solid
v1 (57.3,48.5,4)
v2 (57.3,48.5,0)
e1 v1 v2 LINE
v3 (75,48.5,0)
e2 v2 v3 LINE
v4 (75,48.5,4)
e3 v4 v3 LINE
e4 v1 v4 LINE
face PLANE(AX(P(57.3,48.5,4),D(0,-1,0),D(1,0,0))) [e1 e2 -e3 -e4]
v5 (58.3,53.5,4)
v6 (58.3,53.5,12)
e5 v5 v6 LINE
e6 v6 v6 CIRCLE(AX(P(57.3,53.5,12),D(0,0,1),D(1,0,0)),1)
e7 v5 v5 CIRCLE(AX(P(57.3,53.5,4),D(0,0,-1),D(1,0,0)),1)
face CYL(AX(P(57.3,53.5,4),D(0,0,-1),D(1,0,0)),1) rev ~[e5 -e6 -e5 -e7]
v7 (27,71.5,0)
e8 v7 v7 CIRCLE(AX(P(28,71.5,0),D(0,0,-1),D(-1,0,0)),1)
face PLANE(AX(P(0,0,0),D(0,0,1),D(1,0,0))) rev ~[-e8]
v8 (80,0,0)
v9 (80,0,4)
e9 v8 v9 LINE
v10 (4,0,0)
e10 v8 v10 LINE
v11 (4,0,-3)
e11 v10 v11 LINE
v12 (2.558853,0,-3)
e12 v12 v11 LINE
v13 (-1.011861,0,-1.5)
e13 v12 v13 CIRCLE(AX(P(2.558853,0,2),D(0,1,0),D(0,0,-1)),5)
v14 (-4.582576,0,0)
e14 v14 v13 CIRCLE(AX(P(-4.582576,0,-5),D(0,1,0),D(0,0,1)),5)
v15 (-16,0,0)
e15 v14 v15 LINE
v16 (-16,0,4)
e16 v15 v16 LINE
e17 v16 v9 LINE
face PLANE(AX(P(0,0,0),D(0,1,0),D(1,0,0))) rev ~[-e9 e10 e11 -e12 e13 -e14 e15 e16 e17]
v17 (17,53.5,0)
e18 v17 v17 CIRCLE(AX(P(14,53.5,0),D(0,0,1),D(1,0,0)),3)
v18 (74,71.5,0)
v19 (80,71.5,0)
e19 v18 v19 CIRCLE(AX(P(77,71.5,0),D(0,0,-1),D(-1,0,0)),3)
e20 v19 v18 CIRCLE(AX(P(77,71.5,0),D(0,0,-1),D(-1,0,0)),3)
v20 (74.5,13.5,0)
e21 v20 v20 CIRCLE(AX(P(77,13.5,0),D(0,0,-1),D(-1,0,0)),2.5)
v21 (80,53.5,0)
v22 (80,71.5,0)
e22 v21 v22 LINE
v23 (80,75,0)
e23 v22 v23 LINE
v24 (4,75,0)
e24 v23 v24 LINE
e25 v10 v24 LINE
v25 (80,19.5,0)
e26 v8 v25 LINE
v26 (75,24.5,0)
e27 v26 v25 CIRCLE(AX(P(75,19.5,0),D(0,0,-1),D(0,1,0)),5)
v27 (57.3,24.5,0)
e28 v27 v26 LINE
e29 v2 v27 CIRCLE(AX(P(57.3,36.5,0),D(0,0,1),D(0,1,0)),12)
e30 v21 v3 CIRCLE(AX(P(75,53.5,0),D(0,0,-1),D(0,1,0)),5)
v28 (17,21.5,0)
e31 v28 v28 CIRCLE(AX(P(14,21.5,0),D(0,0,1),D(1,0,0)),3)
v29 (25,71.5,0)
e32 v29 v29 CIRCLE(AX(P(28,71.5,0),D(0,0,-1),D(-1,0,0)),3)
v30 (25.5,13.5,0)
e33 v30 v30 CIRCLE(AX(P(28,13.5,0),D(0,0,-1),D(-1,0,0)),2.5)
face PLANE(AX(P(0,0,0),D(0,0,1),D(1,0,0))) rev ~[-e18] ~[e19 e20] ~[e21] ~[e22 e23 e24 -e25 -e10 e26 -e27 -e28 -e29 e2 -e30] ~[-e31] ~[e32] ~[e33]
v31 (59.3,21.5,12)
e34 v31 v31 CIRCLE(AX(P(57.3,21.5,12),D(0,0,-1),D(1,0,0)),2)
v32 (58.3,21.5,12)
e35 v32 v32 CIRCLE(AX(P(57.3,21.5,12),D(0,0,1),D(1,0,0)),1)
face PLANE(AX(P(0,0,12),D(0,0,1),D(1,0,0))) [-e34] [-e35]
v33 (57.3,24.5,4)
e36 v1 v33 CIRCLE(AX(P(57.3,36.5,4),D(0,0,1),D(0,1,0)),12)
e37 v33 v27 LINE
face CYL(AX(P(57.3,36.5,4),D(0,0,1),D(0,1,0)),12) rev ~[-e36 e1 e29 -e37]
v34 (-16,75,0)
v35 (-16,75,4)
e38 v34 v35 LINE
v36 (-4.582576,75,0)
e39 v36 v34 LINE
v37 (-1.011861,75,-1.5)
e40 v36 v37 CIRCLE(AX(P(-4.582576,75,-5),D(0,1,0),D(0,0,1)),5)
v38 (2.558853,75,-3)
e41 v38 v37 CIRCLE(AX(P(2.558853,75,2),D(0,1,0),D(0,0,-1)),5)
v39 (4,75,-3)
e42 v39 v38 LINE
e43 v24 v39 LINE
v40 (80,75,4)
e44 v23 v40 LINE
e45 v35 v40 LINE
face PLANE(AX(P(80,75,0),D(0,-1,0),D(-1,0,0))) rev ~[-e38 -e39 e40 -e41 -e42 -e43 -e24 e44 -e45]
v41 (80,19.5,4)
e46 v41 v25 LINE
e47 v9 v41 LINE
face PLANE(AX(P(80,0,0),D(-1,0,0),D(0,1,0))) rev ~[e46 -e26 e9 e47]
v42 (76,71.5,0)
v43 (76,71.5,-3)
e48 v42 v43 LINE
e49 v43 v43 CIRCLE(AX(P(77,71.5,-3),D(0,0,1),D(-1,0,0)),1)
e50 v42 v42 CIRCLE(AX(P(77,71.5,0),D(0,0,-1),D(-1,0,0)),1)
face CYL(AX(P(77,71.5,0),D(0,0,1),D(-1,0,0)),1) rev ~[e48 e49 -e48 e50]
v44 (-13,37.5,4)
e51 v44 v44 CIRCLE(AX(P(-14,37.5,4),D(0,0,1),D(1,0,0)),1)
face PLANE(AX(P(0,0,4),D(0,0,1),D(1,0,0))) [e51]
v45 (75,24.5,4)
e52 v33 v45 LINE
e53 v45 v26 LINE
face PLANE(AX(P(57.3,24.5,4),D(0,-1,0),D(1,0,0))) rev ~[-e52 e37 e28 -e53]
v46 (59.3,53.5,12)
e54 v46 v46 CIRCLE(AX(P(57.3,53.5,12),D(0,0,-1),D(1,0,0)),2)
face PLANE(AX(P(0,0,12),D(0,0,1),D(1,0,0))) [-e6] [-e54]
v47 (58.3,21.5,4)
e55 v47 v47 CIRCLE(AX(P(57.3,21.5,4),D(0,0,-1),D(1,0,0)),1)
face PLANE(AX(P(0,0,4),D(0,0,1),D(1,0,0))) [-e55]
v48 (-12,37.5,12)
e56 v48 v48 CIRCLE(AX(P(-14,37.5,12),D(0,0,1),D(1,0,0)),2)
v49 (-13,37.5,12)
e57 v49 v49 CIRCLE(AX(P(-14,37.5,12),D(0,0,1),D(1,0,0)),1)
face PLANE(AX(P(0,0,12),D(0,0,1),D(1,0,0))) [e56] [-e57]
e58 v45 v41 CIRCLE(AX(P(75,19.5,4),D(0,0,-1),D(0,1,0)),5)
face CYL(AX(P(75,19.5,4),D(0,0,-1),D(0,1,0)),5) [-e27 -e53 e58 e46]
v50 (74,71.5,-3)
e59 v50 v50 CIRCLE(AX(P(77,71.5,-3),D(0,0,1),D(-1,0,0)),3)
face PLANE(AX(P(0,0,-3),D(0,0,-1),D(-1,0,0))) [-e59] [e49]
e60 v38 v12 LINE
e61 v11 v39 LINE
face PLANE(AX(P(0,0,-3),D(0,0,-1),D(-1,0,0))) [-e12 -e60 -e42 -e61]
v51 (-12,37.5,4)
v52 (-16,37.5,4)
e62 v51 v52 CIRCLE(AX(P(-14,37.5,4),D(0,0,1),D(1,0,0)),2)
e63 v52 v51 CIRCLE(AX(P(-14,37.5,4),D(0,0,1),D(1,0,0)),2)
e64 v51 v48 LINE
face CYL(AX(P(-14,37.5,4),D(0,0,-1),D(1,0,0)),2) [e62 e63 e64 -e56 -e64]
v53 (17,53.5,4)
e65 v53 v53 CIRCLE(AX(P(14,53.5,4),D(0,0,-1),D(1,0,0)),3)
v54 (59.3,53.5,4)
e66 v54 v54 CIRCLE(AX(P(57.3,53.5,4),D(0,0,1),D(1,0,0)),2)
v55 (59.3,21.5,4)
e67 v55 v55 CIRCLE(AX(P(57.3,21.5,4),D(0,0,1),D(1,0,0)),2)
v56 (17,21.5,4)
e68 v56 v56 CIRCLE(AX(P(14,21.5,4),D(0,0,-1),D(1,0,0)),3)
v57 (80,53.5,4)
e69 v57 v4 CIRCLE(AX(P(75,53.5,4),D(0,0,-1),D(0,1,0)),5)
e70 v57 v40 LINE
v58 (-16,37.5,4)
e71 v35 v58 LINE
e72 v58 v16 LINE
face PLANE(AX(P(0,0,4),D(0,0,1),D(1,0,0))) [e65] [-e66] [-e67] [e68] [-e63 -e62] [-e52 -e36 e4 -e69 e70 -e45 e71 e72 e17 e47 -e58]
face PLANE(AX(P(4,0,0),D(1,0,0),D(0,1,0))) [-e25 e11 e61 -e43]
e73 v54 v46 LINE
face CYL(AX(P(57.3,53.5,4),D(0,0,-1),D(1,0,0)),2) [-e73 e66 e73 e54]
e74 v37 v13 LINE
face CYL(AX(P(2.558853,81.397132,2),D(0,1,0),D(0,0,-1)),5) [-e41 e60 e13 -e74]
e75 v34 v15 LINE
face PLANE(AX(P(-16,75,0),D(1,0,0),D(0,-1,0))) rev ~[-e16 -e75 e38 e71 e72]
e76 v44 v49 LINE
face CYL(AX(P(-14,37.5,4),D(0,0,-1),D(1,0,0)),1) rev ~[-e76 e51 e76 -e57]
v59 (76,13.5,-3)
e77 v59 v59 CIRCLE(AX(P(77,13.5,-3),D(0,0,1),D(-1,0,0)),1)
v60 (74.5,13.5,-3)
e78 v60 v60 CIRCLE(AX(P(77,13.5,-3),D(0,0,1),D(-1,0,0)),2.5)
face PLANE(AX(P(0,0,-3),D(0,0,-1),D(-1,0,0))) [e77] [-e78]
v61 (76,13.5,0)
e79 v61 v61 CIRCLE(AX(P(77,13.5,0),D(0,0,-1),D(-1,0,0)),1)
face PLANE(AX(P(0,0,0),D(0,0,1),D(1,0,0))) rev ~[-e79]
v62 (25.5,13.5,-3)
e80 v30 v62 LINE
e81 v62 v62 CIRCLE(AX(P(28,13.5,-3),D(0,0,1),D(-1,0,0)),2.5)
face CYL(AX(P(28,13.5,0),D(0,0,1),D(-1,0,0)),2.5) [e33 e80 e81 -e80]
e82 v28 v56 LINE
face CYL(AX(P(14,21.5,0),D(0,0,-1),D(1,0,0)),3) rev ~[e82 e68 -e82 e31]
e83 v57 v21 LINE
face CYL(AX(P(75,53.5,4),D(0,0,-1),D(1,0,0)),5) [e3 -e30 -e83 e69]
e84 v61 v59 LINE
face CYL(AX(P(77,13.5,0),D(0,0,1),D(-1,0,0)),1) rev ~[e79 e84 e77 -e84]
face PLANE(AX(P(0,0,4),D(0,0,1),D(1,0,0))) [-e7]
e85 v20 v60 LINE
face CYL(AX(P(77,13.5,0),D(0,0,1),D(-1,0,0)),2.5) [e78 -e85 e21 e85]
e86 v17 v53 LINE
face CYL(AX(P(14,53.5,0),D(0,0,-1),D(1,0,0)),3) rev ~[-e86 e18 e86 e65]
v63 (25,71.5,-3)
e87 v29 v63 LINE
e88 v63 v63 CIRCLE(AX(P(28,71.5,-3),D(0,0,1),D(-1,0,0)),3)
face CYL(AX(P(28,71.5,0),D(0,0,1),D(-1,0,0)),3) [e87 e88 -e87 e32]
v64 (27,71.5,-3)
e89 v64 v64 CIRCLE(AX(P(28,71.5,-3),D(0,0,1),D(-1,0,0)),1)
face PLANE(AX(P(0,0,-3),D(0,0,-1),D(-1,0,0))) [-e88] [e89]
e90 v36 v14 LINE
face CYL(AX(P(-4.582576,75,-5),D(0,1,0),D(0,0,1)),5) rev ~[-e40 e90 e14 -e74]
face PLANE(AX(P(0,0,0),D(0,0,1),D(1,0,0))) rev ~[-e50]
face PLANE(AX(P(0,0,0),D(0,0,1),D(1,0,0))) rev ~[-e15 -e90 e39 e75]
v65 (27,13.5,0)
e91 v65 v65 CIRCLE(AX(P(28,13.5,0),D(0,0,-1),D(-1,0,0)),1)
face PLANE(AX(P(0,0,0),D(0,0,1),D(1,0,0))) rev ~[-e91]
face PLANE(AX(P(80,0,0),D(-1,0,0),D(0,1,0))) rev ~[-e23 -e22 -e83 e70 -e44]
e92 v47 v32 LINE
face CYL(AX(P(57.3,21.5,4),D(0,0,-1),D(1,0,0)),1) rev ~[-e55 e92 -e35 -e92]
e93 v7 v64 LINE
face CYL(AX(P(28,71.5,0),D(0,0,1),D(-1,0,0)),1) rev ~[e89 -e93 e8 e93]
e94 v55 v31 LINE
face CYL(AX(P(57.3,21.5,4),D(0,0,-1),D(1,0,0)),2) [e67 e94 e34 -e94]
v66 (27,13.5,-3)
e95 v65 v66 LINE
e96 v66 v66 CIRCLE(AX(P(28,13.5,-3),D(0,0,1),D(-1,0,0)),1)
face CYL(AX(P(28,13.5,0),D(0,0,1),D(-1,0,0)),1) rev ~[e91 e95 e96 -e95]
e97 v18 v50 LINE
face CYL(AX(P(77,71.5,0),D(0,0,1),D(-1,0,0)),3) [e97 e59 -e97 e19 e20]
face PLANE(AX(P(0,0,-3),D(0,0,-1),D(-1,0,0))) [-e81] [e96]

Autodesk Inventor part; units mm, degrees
ref_plane "YZ Plane" through (0, 0, 0) normal (1, 0, 0) x (0, 1, 0)
ref_plane "XZ Plane" through (0, 0, 0) normal (0, 1, 0) x (-1, 0, 0)
ref_plane "XY Plane" through (0, 0, 0) normal (0, 0, 1) x (1, 0, 0)
sketch "Szkic1" plane through (0, 0, 0) normal (0, 0, 1) x (1, 0, 0)
  line L0 (0, 0) -> (80, 0)
  line L1 (80, 0) -> (80, 75)
  line L2 (80, 75) -> (0, 75)
  line L3 (0, 75) -> (0, 0)
  circle A0 centre (14, 53.5) radius 3
  line L4 (14, 53.5) -> (14, 21.5)
  circle A1 centre (14, 21.5) radius 3
  line L5 (0, 75) -> (-16, 75)
  line L6 (-16, 75) -> (-16, 0)
  line L7 (-16, 0) -> (0, 0)
  line L8 (0, 0) -> (0, 75)
  dimension "d0" = 80
  dimension "d1" = 75
  dimension "d2" = 6
  dimension "d3" = 32
  dimension "d4" = 6
  dimension "d5" = 16
  dimension "d43" = 66
extrude "Wyciągnięcie proste1" add sketch "Szkic1" along normal blind 4
sketch "Szkic2" plane through (0, 0, 0) normal (0, 0, -1) x (-1, 0, 0)
  line L0 (16, 75) -> (16, 0) projected
  line L1 (-80, 75) -> (16, 75) projected
  line L2 (-80, 0) -> (-80, 75) projected
  line L3 (16, 0) -> (-80, 0) projected
  circle A0 centre (-14, 53.5) radius 3 projected
  circle A1 centre (-14, 21.5) radius 3 projected
  line L4 (-80, 75) -> (16, 75) projected
  line L5 (0, 0) -> (-4, 0)
  line L6 (-4, 0) -> (-4, 75)
  line L7 (-4, 75) -> (0, 75)
  line L8 (0, 75) -> (0, 0)
  line L9 (-4, 0) -> (-24, 0)
  line L10 (-24, 0) -> (-24, 75)
  line L11 (-24, 75) -> (-4, 75)
  line L12 (-4, 75) -> (-4, 0)
  line L13 (-24.5, 75) -> (-80.5, 75)
  line L14 (-80.5, 75) -> (-80.5, 13.5)
  line L15 (-80.5, 13.5) -> (-24.5, 13.5)
  line L16 (-24.5, 13.5) -> (-24.5, 75)
  line L17 (-28, 17) -> (-77, 17)
  line L18 (-77, 17) -> (-77, 71.5)
  line L19 (-77, 71.5) -> (-28, 71.5)
  line L20 (-28, 71.5) -> (-28, 17)
  circle A2 centre (-28, 71.5) radius 1
  circle A3 centre (-77, 71.5) radius 1
  circle A4 centre (-28, 71.5) radius 3
  circle A5 centre (-77, 71.5) radius 3
  circle A6 centre (-28, 13.5) radius 1
  circle A7 centre (-77, 13.5) radius 1
  circle A8 centre (-77, 13.5) radius 2.5
  circle A9 centre (-28, 13.5) radius 2.5
  dimension "d8" = 4
  dimension "d9" = 20
  dimension "d10" = 56
  dimension "d11" = 61.5
  dimension "d12" = 3.5
  dimension "d15" = 2
  dimension "d16" = 2
  dimension "d19" = 2
  dimension "d20" = 2
  dimension "d34" = 2
  dimension "d35" = 2
  dimension "d36" = 1.5
  dimension "d37" = 1.5
  dimension "d44" = 4
extrude "Wyciągnięcie proste2" add sketch "Szkic2" along normal blind 3 contours L8 L3 L6 L1 | A5 L19 A3 L18 | A9 L15 A6 | L15 A6 A9 | A8 L15 A7 | L15 A7 A8 | A5 L18 A3 L19 | A4 L20 A2 L19 | L19 A2 L20 A4
sketch "Szkic3" plane through (0, 0, 4) normal (0, 0, 1) x (1, 0, 0)
  circle A0 centre (-14, 37.5) radius 2
  circle A1 centre (-14, 37.5) radius 1
  line L0 (-14, 37.5) -> (57.3, 37.5)
  line L1 (57.3, 37.5) -> (57.3, 53.5)
  line L2 (57.3, 37.5) -> (57.3, 21.5)
  circle A2 centre (57.3, 21.5) radius 1
  circle A3 centre (57.3, 21.5) radius 2
  circle A4 centre (57.3, 53.5) radius 1
  circle A5 centre (57.3, 53.5) radius 2
  point P0 (0, 0)
  dimension "d23" = 4
  dimension "d24" = 2
  dimension "d25" = 71.3
  dimension "d26" = 16
  dimension "d27" = 16
  dimension "d28" = 2
  dimension "d29" = 4
  dimension "d30" = 2
  dimension "d31" = 4
extrude "Wyciągnięcie proste3" add sketch "Szkic3" along normal blind 8
sketch "Szkic4" plane through (0, 0, 4) normal (0, 0, 1) x (1, 0, 0)
  circle A0 centre (28, 71.5) radius 3 projected
  circle A1 centre (77, 13.5) radius 2.5 projected
  circle A2 centre (28, 13.5) radius 2.5 projected
  line L0 (4, 0) -> (4, 75) projected
  line L1 (80, 75) -> (4, 75) projected
  line L2 (80, 71.5) -> (80, 75) projected
  circle A3 centre (77, 71.5) radius 3 projected
  line L3 (80, 0) -> (80, 71.5) projected
  line L4 (4, 0) -> (80, 0) projected
  circle A4 centre (14, 53.5) radius 3 projected
  circle A5 centre (14, 21.5) radius 3 projected
  circle A6 centre (57.3, 21.5) radius 2 projected
  circle A7 centre (57.3, 53.5) radius 2 projected
  line L5 (57.3, 23.5) -> (57.3, 51.5)
  line L6 (57.3, 51.5) -> (57.3, 36.5)
  line L7 (57.3, 36.5) -> (80, 36.5)
  arc A8 (57.3, 48.5) -> (57.3, 24.5) centre (57.3, 36.5) ccw
  line L8 (57.3, 24.5) -> (80, 24.5)
  line L9 (57.3, 48.5) -> (80, 48.5)
  point P0 (0, 0)
  dimension "d38" = 15
extrude "Wyciągnięcie proste4" cut sketch "Szkic4" against normal blind 4 contours L8 L5 L7 L3 | L7 L5 L9 L3 | A8 L5
fillet "Zaokrąglenie1" radius 5 2 edges at (80, 24.5, 2) (80, 48.5, 2)
fillet "Zaokrąglenie2" radius 5 2 edges at (0, 37.5, 0) (0, 37.5, -3)
properties part number "RP4_LidarHolder"
